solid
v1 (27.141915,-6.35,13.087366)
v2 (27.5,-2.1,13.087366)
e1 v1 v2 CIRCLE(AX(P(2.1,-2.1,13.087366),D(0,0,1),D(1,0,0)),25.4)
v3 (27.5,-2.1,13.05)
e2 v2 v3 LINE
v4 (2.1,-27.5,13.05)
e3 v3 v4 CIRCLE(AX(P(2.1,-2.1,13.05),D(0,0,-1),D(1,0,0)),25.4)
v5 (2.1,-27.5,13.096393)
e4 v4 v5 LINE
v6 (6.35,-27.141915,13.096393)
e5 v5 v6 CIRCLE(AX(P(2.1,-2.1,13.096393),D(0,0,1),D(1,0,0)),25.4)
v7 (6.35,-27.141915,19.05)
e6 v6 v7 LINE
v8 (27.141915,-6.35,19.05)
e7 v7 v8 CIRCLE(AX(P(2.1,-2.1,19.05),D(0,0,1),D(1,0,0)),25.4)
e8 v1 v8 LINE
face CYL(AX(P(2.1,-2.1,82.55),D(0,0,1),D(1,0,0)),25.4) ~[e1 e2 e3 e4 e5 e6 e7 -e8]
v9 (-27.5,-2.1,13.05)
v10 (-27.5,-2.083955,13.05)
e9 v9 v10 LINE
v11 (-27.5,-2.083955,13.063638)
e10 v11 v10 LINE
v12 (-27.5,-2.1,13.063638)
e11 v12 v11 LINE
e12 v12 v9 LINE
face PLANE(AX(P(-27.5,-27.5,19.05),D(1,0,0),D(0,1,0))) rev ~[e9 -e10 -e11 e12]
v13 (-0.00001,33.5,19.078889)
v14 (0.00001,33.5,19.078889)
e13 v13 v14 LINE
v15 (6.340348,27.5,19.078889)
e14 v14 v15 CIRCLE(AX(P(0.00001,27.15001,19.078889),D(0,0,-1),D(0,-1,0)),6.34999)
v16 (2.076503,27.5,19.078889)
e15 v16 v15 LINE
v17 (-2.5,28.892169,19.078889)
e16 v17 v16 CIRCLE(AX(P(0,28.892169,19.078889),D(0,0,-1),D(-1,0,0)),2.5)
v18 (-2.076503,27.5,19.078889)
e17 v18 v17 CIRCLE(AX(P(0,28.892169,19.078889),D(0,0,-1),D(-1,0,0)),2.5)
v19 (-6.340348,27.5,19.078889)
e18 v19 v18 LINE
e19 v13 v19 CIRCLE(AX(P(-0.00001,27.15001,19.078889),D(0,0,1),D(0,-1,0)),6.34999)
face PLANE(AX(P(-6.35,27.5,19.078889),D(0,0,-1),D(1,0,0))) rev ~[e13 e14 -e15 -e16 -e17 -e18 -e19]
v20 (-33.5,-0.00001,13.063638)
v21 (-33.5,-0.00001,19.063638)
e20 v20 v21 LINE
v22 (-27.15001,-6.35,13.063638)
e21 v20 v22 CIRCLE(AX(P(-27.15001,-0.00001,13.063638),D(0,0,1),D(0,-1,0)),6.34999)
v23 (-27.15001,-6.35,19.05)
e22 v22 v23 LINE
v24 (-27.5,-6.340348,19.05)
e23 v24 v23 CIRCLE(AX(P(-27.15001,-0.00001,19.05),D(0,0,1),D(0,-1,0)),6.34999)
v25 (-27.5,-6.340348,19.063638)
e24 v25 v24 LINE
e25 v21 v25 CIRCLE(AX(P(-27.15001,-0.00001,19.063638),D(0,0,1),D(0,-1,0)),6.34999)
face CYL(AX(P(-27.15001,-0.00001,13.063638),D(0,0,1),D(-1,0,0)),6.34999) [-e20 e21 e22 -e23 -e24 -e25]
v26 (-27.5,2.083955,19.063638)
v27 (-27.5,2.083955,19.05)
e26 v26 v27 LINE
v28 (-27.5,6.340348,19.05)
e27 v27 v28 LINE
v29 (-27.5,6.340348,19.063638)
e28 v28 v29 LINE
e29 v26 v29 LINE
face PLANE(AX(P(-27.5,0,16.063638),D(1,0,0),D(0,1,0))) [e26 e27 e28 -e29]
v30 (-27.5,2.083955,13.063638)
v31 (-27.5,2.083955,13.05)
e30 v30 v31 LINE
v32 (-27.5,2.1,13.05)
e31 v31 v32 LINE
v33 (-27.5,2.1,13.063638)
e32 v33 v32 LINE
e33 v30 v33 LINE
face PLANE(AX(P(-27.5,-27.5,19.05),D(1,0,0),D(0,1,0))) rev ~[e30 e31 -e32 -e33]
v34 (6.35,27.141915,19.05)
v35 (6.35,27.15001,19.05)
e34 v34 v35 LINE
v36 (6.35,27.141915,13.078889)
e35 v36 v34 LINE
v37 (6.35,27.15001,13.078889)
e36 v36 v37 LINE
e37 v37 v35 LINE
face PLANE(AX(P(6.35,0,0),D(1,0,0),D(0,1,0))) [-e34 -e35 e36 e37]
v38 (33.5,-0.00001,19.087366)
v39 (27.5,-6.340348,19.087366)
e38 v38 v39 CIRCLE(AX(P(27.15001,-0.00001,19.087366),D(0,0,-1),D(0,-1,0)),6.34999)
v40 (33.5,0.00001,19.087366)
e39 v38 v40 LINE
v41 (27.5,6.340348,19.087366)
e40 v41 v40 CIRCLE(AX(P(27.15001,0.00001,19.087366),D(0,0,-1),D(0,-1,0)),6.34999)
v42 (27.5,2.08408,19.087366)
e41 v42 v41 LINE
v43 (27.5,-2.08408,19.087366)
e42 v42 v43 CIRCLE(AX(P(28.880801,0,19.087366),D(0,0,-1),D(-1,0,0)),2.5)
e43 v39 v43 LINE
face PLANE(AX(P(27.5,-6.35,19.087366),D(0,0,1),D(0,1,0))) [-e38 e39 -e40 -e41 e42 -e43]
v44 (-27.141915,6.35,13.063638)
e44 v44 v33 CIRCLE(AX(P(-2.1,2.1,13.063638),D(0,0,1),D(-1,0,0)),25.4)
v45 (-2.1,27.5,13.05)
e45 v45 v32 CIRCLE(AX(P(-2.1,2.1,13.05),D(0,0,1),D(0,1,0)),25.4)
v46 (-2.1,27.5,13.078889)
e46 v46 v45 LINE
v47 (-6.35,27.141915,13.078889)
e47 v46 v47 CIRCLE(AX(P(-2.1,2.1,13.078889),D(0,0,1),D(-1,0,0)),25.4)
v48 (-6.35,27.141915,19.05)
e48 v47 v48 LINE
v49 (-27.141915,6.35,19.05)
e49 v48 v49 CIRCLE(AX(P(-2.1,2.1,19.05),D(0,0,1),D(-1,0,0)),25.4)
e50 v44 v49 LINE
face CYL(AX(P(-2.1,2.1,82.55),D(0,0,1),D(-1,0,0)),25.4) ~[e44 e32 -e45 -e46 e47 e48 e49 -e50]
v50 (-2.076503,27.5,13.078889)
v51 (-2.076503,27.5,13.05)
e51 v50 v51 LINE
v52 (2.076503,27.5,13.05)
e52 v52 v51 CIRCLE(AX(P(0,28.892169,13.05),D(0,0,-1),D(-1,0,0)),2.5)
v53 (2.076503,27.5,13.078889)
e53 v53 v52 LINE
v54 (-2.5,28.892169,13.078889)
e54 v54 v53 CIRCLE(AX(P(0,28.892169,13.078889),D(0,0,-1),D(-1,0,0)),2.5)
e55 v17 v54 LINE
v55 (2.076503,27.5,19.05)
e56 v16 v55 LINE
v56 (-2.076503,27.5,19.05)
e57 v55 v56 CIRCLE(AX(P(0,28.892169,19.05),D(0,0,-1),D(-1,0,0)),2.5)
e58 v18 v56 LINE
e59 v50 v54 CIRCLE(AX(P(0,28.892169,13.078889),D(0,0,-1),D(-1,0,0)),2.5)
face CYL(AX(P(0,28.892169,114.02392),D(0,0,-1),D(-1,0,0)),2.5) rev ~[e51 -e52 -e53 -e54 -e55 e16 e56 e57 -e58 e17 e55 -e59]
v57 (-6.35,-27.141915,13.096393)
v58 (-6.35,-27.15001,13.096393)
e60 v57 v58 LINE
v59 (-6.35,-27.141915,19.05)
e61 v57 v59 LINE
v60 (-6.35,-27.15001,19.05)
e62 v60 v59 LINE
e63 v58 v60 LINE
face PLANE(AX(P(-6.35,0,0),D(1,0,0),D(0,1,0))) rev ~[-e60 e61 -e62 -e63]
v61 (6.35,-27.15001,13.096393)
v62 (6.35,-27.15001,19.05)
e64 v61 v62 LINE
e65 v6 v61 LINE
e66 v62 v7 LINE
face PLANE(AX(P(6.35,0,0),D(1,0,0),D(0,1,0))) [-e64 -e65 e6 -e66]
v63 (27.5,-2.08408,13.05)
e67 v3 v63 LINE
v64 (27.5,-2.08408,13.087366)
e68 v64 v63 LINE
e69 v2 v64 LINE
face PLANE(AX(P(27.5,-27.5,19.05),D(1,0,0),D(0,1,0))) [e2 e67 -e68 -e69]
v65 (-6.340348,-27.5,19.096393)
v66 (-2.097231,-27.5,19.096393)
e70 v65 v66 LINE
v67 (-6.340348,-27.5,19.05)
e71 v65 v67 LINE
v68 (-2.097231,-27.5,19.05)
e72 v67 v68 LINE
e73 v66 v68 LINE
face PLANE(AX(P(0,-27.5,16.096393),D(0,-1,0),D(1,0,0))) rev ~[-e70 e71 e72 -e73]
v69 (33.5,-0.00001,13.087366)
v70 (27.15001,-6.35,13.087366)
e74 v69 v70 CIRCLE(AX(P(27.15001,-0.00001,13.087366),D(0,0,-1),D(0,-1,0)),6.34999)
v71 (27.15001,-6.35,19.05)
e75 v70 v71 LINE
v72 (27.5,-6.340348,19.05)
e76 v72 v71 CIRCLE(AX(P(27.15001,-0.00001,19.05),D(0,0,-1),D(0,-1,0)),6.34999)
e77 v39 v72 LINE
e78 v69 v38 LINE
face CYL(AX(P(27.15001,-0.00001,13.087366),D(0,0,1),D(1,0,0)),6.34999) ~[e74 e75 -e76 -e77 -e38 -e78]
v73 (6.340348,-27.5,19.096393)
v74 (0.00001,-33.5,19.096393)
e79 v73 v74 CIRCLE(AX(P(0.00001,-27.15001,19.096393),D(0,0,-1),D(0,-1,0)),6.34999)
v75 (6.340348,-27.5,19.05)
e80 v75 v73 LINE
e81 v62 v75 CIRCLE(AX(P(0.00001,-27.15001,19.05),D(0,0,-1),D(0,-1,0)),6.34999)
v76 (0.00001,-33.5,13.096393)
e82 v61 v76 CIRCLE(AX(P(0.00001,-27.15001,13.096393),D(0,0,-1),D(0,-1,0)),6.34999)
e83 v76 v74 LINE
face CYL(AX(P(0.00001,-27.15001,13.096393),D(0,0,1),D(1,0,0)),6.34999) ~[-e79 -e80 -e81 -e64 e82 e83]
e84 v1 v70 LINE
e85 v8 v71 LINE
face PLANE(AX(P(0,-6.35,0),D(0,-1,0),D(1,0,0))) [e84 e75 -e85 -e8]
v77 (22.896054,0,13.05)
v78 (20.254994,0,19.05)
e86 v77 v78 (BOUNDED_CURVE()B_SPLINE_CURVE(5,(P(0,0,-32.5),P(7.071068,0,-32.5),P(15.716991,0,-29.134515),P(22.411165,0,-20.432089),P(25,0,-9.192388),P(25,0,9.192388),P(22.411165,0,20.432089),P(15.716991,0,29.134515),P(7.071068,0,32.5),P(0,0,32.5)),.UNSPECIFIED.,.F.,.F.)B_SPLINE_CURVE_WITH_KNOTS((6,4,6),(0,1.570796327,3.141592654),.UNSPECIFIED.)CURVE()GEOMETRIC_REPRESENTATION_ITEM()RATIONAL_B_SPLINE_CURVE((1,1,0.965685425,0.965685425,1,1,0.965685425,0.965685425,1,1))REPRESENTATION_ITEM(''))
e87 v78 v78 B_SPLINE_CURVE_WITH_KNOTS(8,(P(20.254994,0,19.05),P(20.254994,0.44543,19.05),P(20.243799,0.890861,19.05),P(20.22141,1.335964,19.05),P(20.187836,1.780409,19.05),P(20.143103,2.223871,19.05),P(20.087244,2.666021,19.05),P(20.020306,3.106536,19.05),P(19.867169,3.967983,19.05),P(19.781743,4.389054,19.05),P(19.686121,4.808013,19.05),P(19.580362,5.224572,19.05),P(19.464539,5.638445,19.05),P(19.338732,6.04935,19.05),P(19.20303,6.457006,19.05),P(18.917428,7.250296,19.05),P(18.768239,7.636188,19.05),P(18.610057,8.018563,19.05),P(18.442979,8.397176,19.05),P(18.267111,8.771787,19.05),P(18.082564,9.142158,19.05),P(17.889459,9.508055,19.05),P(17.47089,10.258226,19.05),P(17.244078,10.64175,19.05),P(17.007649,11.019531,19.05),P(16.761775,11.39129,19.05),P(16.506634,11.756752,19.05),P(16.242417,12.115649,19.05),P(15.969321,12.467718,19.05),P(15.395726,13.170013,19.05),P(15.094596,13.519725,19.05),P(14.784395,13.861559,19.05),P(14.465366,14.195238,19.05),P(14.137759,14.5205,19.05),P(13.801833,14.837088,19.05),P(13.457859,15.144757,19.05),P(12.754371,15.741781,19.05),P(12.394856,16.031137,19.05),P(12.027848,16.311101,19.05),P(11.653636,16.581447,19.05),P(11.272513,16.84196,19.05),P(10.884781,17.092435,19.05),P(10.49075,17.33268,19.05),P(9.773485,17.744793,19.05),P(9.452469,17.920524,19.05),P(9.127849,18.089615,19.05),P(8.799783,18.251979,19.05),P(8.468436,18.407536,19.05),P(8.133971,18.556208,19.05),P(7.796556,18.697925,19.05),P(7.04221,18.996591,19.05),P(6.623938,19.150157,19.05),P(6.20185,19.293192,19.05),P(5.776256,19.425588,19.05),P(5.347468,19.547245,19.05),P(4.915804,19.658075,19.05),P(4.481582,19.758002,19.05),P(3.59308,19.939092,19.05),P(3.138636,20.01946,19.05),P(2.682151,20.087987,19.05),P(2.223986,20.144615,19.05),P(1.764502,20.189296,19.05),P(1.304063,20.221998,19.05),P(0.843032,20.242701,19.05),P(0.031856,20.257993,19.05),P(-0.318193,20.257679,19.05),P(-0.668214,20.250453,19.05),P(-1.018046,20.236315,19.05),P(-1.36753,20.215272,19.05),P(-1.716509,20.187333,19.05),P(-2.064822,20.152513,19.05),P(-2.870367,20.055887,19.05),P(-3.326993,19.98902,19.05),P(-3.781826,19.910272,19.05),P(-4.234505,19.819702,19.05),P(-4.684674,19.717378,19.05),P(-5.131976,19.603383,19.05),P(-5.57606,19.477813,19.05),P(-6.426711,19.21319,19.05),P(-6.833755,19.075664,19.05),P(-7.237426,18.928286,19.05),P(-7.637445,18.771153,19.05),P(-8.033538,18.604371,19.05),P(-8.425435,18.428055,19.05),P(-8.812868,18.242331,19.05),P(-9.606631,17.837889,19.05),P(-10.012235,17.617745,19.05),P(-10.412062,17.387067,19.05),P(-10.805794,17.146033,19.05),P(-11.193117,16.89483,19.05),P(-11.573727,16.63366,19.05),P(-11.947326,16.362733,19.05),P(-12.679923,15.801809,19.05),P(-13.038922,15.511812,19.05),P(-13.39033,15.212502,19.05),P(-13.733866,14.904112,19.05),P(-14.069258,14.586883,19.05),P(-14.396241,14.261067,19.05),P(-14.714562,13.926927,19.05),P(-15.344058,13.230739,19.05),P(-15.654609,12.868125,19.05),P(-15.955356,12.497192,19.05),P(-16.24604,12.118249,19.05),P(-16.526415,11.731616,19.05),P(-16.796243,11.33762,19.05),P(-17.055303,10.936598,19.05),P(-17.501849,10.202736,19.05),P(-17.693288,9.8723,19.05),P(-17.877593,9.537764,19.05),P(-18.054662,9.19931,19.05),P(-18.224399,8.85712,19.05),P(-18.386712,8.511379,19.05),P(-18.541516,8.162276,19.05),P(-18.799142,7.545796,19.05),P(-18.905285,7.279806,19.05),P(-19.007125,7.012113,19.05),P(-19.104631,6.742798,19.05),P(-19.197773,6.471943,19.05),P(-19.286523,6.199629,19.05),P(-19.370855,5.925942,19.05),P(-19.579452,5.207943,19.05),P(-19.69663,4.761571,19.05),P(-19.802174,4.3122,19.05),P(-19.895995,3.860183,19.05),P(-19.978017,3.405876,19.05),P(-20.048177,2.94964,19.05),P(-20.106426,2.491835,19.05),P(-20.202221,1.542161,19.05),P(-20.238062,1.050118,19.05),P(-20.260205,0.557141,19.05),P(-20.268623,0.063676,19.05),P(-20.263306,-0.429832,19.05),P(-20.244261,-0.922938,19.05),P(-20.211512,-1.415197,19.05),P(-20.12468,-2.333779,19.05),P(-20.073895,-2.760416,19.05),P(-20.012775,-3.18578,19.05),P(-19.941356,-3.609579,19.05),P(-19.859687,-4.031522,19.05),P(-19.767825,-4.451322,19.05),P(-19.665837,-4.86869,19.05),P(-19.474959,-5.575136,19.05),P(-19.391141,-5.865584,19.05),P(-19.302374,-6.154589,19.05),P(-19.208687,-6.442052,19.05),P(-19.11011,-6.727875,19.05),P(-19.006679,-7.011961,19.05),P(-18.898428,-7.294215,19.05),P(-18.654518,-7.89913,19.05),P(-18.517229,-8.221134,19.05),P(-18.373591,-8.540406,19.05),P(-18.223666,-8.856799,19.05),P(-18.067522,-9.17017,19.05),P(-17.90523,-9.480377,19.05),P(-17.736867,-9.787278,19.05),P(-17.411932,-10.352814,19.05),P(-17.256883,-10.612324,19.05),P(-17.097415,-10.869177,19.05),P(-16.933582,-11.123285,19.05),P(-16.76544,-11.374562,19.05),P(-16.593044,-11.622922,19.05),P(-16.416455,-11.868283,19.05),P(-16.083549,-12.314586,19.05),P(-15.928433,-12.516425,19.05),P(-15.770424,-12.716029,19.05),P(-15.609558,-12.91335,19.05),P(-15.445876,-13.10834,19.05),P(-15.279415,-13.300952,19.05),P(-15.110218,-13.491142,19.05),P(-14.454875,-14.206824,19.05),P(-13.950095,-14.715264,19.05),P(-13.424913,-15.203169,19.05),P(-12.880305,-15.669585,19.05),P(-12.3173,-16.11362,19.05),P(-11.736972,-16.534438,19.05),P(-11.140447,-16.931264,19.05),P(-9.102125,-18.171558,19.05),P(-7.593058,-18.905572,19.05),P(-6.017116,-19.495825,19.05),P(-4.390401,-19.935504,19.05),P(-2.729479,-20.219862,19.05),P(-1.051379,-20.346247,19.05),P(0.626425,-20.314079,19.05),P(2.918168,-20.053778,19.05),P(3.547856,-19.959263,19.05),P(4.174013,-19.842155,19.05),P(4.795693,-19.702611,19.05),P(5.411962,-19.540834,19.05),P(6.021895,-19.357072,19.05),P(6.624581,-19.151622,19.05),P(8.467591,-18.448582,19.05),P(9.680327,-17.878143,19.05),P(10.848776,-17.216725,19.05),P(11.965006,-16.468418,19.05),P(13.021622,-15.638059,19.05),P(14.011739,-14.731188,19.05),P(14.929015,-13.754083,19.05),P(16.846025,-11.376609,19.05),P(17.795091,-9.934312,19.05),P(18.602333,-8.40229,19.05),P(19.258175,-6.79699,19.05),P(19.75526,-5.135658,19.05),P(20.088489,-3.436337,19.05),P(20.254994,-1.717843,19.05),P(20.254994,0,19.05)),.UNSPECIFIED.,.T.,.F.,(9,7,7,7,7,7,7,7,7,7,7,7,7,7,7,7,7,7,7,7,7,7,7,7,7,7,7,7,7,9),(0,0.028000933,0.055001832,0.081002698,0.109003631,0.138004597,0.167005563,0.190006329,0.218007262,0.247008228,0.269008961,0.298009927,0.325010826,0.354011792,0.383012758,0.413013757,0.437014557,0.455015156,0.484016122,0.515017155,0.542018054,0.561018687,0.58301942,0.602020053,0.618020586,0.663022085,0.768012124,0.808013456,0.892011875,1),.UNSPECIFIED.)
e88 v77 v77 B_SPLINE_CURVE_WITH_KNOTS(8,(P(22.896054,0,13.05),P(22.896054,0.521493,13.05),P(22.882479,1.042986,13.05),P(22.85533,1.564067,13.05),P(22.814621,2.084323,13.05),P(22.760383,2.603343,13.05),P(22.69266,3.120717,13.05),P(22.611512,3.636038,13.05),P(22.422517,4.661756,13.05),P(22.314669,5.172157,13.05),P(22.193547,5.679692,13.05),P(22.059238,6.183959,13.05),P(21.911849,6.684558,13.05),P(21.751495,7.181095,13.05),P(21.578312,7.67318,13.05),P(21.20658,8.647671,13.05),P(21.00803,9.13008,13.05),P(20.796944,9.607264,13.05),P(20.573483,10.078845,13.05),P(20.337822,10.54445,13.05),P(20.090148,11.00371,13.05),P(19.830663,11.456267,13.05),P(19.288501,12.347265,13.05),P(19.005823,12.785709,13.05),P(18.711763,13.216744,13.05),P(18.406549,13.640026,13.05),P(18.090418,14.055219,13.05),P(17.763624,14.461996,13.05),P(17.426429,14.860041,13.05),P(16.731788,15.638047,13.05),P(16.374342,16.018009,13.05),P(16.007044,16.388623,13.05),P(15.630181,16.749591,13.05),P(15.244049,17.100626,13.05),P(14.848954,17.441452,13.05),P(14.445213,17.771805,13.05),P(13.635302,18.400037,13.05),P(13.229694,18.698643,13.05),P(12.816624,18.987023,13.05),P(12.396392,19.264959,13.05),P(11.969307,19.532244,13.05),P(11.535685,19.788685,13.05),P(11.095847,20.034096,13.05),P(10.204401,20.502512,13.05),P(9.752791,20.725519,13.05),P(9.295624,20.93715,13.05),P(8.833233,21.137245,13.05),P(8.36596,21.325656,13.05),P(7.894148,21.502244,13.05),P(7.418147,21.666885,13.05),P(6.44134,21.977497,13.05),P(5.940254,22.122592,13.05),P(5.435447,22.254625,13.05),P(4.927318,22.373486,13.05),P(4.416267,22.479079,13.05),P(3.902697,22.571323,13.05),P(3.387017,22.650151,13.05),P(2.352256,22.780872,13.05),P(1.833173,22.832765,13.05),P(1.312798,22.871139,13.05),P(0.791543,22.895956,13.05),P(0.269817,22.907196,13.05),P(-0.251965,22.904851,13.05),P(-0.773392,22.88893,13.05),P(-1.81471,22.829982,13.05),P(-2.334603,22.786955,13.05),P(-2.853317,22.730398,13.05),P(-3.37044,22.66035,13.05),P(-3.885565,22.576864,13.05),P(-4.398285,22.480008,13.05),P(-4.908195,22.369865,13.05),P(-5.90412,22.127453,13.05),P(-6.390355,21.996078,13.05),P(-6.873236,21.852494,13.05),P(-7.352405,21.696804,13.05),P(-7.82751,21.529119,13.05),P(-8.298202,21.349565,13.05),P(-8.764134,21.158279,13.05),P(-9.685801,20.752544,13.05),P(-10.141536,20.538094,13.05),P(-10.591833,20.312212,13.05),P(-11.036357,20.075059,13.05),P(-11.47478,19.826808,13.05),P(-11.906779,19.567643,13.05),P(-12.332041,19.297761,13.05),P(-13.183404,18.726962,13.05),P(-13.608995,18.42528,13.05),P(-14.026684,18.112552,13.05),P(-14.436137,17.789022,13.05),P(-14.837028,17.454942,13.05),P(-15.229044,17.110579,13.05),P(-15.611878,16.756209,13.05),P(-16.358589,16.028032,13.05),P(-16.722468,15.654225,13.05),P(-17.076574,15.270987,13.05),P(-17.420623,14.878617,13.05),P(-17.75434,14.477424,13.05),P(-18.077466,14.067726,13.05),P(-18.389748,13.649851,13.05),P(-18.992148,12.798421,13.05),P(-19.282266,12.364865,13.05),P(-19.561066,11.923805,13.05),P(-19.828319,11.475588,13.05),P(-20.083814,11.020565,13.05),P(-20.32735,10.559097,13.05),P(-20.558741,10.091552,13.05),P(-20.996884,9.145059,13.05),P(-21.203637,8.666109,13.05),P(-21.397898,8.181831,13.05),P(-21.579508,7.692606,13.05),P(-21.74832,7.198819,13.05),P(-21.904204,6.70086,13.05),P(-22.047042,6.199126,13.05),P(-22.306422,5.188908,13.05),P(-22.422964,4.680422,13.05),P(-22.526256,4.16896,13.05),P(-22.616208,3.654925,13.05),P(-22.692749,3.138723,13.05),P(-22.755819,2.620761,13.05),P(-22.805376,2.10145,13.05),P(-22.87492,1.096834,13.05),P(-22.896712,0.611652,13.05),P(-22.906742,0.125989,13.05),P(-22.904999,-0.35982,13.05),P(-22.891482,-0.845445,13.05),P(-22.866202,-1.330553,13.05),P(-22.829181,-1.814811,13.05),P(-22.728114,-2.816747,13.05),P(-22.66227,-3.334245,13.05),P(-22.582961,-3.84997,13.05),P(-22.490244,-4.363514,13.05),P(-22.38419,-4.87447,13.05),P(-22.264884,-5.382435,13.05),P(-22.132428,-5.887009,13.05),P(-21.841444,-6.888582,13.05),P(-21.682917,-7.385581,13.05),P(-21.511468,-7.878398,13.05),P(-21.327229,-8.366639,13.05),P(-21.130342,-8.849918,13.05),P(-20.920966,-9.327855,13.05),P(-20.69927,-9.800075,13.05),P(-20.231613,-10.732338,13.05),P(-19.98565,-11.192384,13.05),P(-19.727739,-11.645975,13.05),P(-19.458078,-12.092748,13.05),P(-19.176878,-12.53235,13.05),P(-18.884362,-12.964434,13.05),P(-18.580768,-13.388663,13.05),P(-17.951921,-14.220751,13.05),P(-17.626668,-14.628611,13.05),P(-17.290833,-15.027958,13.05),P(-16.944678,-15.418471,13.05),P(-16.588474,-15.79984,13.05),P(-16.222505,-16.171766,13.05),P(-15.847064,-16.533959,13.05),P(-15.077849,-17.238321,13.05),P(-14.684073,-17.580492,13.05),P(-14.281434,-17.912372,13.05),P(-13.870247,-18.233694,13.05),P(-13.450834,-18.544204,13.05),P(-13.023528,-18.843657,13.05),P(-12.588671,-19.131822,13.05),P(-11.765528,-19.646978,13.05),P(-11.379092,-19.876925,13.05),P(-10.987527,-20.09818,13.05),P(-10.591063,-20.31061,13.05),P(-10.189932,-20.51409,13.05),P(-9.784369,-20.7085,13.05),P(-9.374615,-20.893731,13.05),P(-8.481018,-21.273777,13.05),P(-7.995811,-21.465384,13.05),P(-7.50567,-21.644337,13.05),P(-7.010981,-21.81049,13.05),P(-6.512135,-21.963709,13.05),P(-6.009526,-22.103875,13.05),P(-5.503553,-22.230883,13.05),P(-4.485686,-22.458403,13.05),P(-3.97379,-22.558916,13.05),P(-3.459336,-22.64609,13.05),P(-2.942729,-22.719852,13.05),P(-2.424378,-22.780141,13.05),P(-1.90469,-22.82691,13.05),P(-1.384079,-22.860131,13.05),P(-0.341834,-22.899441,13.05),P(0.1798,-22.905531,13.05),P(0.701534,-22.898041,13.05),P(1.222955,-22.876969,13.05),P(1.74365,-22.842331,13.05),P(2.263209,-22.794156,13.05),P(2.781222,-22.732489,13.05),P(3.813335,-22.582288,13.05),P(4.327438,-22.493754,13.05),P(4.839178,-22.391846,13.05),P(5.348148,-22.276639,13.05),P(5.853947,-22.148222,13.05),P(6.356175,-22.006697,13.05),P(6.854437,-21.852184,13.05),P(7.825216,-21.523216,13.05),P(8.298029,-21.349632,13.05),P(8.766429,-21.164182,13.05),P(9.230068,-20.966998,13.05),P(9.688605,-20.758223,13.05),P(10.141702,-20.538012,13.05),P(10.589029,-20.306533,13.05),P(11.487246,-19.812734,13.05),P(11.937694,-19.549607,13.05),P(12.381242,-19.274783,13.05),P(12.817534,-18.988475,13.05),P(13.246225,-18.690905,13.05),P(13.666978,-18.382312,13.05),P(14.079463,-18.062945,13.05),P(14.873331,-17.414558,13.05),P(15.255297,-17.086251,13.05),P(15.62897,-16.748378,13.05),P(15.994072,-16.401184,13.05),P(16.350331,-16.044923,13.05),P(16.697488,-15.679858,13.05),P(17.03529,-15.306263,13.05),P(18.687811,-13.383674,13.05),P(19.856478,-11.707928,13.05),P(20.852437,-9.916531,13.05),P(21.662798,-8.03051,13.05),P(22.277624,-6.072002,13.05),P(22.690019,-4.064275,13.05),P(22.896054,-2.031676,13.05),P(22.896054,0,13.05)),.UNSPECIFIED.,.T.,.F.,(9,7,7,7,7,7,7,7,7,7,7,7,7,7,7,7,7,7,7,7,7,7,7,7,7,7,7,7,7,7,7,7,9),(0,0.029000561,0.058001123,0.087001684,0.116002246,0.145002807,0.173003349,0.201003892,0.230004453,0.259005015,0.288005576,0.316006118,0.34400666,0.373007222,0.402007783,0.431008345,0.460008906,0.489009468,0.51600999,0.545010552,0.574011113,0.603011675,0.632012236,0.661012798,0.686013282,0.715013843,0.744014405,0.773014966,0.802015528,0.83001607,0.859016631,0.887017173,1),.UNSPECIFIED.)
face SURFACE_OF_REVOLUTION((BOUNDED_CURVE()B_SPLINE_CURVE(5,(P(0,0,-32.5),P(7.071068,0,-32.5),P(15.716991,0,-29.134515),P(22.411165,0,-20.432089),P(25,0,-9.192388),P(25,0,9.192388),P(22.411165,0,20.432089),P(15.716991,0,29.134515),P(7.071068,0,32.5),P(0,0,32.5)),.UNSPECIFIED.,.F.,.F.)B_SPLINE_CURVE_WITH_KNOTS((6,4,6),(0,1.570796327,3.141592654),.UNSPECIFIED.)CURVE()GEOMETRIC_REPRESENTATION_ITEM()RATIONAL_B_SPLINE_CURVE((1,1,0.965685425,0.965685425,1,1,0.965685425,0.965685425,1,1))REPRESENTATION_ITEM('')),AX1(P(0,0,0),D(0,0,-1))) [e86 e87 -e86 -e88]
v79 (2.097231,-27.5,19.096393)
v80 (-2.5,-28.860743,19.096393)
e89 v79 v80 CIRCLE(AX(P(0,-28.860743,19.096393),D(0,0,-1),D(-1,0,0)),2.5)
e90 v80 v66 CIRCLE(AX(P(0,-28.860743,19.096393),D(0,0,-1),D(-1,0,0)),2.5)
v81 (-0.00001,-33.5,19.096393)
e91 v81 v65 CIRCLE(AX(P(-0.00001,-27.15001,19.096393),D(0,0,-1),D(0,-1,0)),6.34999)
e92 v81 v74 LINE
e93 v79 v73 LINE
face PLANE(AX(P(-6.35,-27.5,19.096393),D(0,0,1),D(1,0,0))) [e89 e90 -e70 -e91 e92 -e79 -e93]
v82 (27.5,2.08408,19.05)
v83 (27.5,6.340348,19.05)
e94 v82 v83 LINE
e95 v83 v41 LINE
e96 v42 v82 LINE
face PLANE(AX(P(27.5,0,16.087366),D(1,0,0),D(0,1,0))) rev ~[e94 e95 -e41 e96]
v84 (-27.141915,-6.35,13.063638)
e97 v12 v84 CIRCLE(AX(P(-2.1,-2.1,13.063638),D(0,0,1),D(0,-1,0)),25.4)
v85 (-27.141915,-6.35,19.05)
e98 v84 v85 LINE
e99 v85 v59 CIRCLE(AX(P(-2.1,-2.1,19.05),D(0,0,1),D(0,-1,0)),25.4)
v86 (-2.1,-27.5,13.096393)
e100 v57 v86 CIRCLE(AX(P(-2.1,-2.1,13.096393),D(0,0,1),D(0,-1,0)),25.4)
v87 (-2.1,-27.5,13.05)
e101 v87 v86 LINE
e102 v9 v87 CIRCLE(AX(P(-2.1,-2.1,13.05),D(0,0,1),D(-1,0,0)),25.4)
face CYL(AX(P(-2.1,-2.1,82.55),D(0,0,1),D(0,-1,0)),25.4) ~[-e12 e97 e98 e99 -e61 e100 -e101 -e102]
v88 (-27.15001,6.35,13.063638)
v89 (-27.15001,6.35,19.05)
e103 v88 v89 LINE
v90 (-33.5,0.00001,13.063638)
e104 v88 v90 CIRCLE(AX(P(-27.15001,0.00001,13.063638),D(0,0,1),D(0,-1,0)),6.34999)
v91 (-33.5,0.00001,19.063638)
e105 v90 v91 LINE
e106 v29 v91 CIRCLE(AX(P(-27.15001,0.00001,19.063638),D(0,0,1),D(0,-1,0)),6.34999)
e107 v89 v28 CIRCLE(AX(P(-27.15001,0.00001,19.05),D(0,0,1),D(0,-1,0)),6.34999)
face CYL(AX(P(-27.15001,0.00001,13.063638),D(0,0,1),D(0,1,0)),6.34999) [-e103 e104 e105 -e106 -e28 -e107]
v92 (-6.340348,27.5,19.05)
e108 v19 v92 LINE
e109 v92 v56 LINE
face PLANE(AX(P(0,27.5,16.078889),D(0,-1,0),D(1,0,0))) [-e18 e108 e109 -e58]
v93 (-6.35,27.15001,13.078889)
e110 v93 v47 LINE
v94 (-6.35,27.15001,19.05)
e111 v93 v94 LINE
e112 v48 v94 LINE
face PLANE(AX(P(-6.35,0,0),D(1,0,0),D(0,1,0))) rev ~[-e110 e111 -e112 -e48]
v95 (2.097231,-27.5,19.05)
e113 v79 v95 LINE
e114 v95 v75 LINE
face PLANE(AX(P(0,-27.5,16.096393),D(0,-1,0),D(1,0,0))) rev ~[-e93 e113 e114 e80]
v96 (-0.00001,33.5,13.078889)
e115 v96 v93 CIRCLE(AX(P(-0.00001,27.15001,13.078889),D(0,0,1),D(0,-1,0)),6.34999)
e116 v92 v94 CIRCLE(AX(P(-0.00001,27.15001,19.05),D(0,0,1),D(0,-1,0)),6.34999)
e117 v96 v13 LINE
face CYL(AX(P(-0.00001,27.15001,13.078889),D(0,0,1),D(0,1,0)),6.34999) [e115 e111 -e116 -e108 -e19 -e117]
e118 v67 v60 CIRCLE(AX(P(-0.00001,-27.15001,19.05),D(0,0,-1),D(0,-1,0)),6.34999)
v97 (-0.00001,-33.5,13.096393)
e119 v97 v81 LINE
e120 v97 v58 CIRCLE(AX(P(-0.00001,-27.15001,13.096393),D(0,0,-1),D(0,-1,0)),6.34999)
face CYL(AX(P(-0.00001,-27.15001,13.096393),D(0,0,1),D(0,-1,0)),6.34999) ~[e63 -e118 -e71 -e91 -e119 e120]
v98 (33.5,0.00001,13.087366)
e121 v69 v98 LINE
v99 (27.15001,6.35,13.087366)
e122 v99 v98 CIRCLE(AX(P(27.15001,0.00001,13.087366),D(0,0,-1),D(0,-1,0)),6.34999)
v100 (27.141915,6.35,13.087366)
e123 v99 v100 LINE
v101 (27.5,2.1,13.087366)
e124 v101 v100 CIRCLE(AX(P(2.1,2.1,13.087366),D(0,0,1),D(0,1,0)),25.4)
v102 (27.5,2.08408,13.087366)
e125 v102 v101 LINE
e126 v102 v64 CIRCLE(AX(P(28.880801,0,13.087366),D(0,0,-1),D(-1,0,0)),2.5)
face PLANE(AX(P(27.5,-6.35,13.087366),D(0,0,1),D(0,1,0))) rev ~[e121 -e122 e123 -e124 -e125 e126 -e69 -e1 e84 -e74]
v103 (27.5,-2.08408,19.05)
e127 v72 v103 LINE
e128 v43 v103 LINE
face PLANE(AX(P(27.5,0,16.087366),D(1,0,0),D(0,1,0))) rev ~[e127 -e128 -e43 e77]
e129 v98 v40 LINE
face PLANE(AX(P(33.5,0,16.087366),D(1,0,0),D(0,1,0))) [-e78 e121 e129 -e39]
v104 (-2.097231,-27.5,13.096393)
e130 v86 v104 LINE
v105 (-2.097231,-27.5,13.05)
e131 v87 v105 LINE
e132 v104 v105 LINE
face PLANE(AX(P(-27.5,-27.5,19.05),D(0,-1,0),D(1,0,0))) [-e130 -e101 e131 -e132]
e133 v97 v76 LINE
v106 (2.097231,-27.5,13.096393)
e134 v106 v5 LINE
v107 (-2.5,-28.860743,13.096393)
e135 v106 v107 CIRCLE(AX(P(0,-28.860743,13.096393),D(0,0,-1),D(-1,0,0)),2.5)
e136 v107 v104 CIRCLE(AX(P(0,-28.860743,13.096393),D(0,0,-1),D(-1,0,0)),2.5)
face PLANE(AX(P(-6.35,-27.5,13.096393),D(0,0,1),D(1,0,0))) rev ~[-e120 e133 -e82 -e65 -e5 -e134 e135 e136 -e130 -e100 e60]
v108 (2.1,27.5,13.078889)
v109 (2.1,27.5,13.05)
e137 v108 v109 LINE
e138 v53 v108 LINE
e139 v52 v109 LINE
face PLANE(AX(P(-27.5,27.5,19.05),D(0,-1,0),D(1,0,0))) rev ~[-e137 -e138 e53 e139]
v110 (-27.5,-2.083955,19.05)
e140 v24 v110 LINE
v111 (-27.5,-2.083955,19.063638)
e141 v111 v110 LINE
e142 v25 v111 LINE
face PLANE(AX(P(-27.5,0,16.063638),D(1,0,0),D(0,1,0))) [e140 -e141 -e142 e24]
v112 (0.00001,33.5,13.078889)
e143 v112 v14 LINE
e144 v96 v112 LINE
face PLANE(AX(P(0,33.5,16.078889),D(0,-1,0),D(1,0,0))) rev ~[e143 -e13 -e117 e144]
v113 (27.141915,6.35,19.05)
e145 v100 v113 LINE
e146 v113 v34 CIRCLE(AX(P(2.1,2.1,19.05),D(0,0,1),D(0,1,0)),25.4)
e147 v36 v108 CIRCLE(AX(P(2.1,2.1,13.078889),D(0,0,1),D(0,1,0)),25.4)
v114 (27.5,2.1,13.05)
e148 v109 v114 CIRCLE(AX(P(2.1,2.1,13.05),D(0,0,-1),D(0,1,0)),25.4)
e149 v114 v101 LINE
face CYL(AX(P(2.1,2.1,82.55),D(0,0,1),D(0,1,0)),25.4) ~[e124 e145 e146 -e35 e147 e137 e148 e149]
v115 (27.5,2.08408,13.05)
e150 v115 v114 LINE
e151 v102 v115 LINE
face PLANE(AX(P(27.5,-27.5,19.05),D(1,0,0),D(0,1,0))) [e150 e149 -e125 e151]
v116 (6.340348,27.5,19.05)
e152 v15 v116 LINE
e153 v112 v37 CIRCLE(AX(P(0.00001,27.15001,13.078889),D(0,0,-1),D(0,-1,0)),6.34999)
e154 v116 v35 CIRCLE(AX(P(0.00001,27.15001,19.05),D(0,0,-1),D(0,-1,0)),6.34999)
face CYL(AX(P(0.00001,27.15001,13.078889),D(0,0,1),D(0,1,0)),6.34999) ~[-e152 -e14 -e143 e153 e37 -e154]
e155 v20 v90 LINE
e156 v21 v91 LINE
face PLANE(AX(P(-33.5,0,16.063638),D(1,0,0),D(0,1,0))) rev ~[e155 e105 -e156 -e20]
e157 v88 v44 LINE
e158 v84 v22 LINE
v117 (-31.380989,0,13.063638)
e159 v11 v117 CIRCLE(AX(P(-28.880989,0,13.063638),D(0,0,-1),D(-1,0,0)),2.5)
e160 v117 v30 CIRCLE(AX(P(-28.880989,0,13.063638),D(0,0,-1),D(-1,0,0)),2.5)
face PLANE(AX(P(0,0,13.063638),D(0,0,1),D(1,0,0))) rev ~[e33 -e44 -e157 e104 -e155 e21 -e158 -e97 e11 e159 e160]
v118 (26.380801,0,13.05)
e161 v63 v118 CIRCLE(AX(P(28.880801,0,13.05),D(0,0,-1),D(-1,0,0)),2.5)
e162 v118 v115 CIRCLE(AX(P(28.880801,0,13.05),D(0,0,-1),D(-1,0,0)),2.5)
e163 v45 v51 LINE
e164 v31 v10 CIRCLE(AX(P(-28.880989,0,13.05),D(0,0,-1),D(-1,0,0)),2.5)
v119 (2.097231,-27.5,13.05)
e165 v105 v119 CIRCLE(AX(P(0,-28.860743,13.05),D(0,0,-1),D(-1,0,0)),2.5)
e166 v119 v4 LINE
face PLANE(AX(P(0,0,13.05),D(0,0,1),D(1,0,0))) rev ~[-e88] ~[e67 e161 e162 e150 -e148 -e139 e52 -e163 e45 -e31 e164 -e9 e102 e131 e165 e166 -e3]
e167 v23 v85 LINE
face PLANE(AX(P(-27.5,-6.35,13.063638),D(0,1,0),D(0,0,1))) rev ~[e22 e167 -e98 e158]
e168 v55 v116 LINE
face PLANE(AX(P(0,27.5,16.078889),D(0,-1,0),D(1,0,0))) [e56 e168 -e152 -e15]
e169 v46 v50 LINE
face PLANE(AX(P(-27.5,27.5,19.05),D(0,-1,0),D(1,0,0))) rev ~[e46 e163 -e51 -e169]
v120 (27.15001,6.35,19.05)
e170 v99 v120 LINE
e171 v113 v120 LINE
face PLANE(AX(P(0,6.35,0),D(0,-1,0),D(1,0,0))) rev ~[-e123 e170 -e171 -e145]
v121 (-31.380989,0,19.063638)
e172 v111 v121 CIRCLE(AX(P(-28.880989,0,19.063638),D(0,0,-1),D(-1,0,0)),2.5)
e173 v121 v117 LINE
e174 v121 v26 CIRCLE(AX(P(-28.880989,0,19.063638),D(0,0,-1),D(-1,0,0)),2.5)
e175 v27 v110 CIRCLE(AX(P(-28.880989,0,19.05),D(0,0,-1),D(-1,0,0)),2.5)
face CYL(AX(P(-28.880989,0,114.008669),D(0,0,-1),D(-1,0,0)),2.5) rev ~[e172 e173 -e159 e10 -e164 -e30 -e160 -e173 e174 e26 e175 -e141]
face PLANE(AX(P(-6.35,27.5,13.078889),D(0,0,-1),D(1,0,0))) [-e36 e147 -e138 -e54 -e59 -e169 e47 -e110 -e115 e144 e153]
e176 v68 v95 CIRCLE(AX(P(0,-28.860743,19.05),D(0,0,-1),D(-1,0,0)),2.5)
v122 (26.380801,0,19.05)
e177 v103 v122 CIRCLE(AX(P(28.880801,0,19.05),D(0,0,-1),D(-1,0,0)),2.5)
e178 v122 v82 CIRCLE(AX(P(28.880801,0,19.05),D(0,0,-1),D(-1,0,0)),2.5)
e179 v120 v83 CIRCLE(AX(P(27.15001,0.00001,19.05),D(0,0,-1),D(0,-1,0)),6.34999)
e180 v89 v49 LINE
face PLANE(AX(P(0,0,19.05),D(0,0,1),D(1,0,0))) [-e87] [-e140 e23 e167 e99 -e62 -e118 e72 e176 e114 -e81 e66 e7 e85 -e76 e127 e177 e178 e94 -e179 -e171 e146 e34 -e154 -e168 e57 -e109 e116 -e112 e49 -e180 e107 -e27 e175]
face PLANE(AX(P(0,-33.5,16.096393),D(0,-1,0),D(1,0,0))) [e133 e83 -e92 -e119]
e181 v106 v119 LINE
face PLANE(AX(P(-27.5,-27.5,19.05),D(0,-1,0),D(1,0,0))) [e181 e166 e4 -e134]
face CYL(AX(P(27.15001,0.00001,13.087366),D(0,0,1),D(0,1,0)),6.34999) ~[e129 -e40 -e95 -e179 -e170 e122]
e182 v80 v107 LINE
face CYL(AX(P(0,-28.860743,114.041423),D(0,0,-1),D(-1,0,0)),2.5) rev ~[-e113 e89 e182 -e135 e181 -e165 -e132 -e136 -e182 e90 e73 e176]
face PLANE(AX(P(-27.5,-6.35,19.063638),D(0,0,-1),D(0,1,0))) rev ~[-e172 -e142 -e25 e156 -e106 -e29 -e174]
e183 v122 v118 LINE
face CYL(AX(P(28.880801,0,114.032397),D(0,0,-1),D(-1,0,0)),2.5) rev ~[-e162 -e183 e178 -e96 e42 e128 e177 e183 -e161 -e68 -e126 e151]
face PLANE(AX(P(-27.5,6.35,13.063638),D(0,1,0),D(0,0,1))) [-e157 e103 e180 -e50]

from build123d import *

# Parameters (mm, degrees)
F3_W          = 55
F3_H          = 55
F4_DEPTH      = 6
F7_W          = 12.7
F7_H          = 6
F8_DEPTH      = 6
F10_W         = 12.7
F10_H         = 6
F11_DEPTH     = 6
F13_W         = 12.7
F13_H         = 6
F14_DEPTH     = 6
F16_W         = 12.7
F16_H         = 6
F17_DEPTH     = 6
F19_D         = 5
F21_D         = 5
F23_D         = 5
F25_D         = 5
F26_T4_DEPTH  = 133
F26_T10_DEPTH = 133
F26_T15_DEPTH = 133
F26_T21_DEPTH = 133
F26_T27_DEPTH = 133
F26_T33_DEPTH = 133
F26_T38_DEPTH = 133
F26_T44_DEPTH = 133
F26_T49_DEPTH = 133
F26_T55_DEPTH = 133
F26_T61_DEPTH = 133
F26_T66_DEPTH = 133
F27_R         = 6.34999


# Not quite as in the source:
# - a fillet or chamfer that OpenCascade refuses, or shapes differently, is made with other operations: its cross-section is extruded or revolved along the edge and cut away or added
# - a fillet or chamfer is up to 0.001 mm smaller than in the source, because OpenCascade refuses the exact size


with BuildPart() as f1:
    # F0 (on Front) → F1 (revolve)
    with BuildSketch(Plane.XZ):
        with BuildLine():
            Line((0, 0), (0, -32.5))
            add(Edge.make_bspline(
                [(0, -32.5), (25, -32.5), (25, 0)],
                knots=[0, 0, 0, 1.5707963268, 1.5707963268, 1.5707963268], degree=2, weights=[1, 0.7071067812, 1]))
            Line((25, 0), (0, 0))
        make_face()
        with BuildLine():
            Line((0, 0), (25, 0))
            add(Edge.make_bspline(
                [(25, 0), (25, 32.5), (0, 32.5)],
                knots=[1.5707963268, 1.5707963268, 1.5707963268, 3.1415926536, 3.1415926536, 3.1415926536], degree=2, weights=[1, 0.7071067812, 1]))
            Line((0, 32.5), (0, 0))
        make_face()
    revolve(axis=Axis((0, 0, 0), (0, 0, -1)))


with BuildPart() as f4:
    # F3 (on offset) → F4 (new body)
    with BuildSketch(Plane.XY.offset(19.05)):
        Rectangle(F3_W, F3_H)
    extrude(amount=-F4_DEPTH)

    # F5: cut F1
    add(f1.part, mode=Mode.SUBTRACT)

    # F7 (on offset) → F8 (join)
    with BuildSketch(Plane.XZ.offset(27.5)):
        with Locations((0, 16.0963926464)):
            Rectangle(F7_W, F7_H)
    extrude(amount=F8_DEPTH)

    # F10 (on offset) → F11 (join)
    with BuildSketch(Plane.YZ.offset(27.5)):
        with Locations((0, 16.087366268)):
            Rectangle(F10_W, F10_H)
    extrude(amount=F11_DEPTH)

    # F13 (on offset) → F14 (join)
    with BuildSketch(Plane.XZ.offset(-27.5)):
        with Locations((0, 16.07888937)):
            Rectangle(F13_W, F13_H)
    extrude(amount=-F14_DEPTH)

    # F16 (on offset) → F17 (join)
    with BuildSketch(Plane.YZ.offset(-27.5)):
        with Locations((0, 16.0636380315)):
            Rectangle(F16_W, F16_H)
    extrude(amount=-F17_DEPTH)

    # F19 (through all)
    with Locations(Plane.XY.offset(19.07888937)):
        with Locations((0, 28.8921689615)):
            Hole(F19_D / 2)

    # F21 (through all)
    with Locations(Plane.XY.offset(19.0636380315)):
        with Locations((-28.8809893653, 0)):
            Hole(F21_D / 2)

    # F23 (through all)
    with Locations(Plane.XY.offset(19.087366268)):
        with Locations((28.8808012381, 0)):
            Hole(F23_D / 2)

    # F25 (through all)
    with Locations(Plane.XY.offset(19.0963926464)):
        with Locations((0, -28.8607433438)):
            Hole(F25_D / 2)

    # F26: fillet of radius 25.4 on 4 edges, made by hand


with BuildPart() as f26_tool2:
    # F26_s3 → F26_t4 (new body)
    with BuildSketch(Plane.XY.offset(82.55)):
        with BuildLine():
            ThreePointArc((-27.5, 2.1), (-20.0605122421, 20.0605122421), (-2.1, 27.5))
            Line((-2.1, 27.5), (-27.5, 27.5))
            Line((-27.5, 27.5), (-27.5, 2.1))
        make_face()
    extrude(amount=-F26_T4_DEPTH)

    split(bisect_by=Plane.XZ.offset(-6.35), keep=Keep.BOTTOM)

    split(bisect_by=Plane.YZ.offset(-6.35), keep=Keep.BOTTOM)


with BuildPart() as f4_1:
    add(f4.part)

    # F26_t1: cut F26_tool2
    add(f26_tool2.part, mode=Mode.SUBTRACT)


with BuildPart() as f26_tool8:
    # F26_s9 → F26_t10 (new body)
    with BuildSketch(Plane.XY.offset(82.55)):
        with BuildLine():
            ThreePointArc((-27.5, 2.1), (-20.0605122421, 20.0605122421), (-2.1, 27.5))
            Line((-2.1, 27.5), (-27.5, 27.5))
            Line((-27.5, 27.5), (-27.5, 2.1))
        make_face()
    extrude(amount=-F26_T10_DEPTH)

    split(bisect_by=Plane.XY.offset(13.0636380315), keep=Keep.BOTTOM)


with BuildPart() as f4_2:
    add(f4_1.part)

    # F26_t7: cut F26_tool8
    add(f26_tool8.part, mode=Mode.SUBTRACT)


with BuildPart() as f26_tool13:
    # F26_s14 → F26_t15 (new body)
    with BuildSketch(Plane.XY.offset(82.55)):
        with BuildLine():
            ThreePointArc((-27.5, 2.1), (-20.0605122421, 20.0605122421), (-2.1, 27.5))
            Line((-2.1, 27.5), (-27.5, 27.5))
            Line((-27.5, 27.5), (-27.5, 2.1))
        make_face()
    extrude(amount=-F26_T15_DEPTH)

    split(bisect_by=Plane.XY.offset(13.07888937), keep=Keep.BOTTOM)

    split(bisect_by=Plane.YZ.offset(-6.35), keep=Keep.TOP)


with BuildPart() as f4_3:
    add(f4_2.part)

    # F26_t12: cut F26_tool13
    add(f26_tool13.part, mode=Mode.SUBTRACT)


with BuildPart() as f26_tool19:
    # F26_s20 → F26_t21 (new body)
    with BuildSketch(Plane.XY.offset(82.55)):
        with BuildLine():
            ThreePointArc((-2.1, -27.5), (-20.0605122421, -20.0605122421), (-27.5, -2.1))
            Line((-27.5, -2.1), (-27.5, -27.5))
            Line((-27.5, -27.5), (-2.1, -27.5))
        make_face()
    extrude(amount=-F26_T21_DEPTH)

    split(bisect_by=Plane.YZ.offset(-6.35), keep=Keep.BOTTOM)

    split(bisect_by=Plane.XZ.offset(6.35), keep=Keep.TOP)


with BuildPart() as f4_4:
    add(f4_3.part)

    # F26_t18: cut F26_tool19
    add(f26_tool19.part, mode=Mode.SUBTRACT)


with BuildPart() as f26_tool25:
    # F26_s26 → F26_t27 (new body)
    with BuildSketch(Plane.XY.offset(82.55)):
        with BuildLine():
            ThreePointArc((-2.1, -27.5), (-20.0605122421, -20.0605122421), (-27.5, -2.1))
            Line((-27.5, -2.1), (-27.5, -27.5))
            Line((-27.5, -27.5), (-2.1, -27.5))
        make_face()
    extrude(amount=-F26_T27_DEPTH)

    split(bisect_by=Plane.XY.offset(13.0963926464), keep=Keep.BOTTOM)

    split(bisect_by=Plane.XZ.offset(6.35), keep=Keep.TOP)


with BuildPart() as f4_5:
    add(f4_4.part)

    # F26_t24: cut F26_tool25
    add(f26_tool25.part, mode=Mode.SUBTRACT)


with BuildPart() as f26_tool31:
    # F26_s32 → F26_t33 (new body)
    with BuildSketch(Plane.XY.offset(82.55)):
        with BuildLine():
            ThreePointArc((-2.1, -27.5), (-20.0605122421, -20.0605122421), (-27.5, -2.1))
            Line((-27.5, -2.1), (-27.5, -27.5))
            Line((-27.5, -27.5), (-2.1, -27.5))
        make_face()
    extrude(amount=-F26_T33_DEPTH)

    split(bisect_by=Plane.XY.offset(13.0636380315), keep=Keep.BOTTOM)


with BuildPart() as f4_6:
    add(f4_5.part)

    # F26_t30: cut F26_tool31
    add(f26_tool31.part, mode=Mode.SUBTRACT)


with BuildPart() as f26_tool36:
    # F26_s37 → F26_t38 (new body)
    with BuildSketch(Plane.XY.offset(82.55)):
        with BuildLine():
            ThreePointArc((27.5, -2.1), (20.0605122421, -20.0605122421), (2.1, -27.5))
            Line((2.1, -27.5), (27.5, -27.5))
            Line((27.5, -27.5), (27.5, -2.1))
        make_face()
    extrude(amount=-F26_T38_DEPTH)

    split(bisect_by=Plane.YZ.offset(6.35), keep=Keep.TOP)

    split(bisect_by=Plane.XZ.offset(6.35), keep=Keep.TOP)


with BuildPart() as f4_7:
    add(f4_6.part)

    # F26_t35: cut F26_tool36
    add(f26_tool36.part, mode=Mode.SUBTRACT)


with BuildPart() as f26_tool42:
    # F26_s43 → F26_t44 (new body)
    with BuildSketch(Plane.XY.offset(82.55)):
        with BuildLine():
            ThreePointArc((27.5, -2.1), (20.0605122421, -20.0605122421), (2.1, -27.5))
            Line((2.1, -27.5), (27.5, -27.5))
            Line((27.5, -27.5), (27.5, -2.1))
        make_face()
    extrude(amount=-F26_T44_DEPTH)

    split(bisect_by=Plane.XY.offset(13.087366268), keep=Keep.BOTTOM)


with BuildPart() as f4_8:
    add(f4_7.part)

    # F26_t41: cut F26_tool42
    add(f26_tool42.part, mode=Mode.SUBTRACT)


with BuildPart() as f26_tool47:
    # F26_s48 → F26_t49 (new body)
    with BuildSketch(Plane.XY.offset(82.55)):
        with BuildLine():
            ThreePointArc((27.5, -2.1), (20.0605122421, -20.0605122421), (2.1, -27.5))
            Line((2.1, -27.5), (27.5, -27.5))
            Line((27.5, -27.5), (27.5, -2.1))
        make_face()
    extrude(amount=-F26_T49_DEPTH)

    split(bisect_by=Plane.XY.offset(13.0963926464), keep=Keep.BOTTOM)

    split(bisect_by=Plane.XZ.offset(6.35), keep=Keep.TOP)


with BuildPart() as f4_9:
    add(f4_8.part)

    # F26_t46: cut F26_tool47
    add(f26_tool47.part, mode=Mode.SUBTRACT)


with BuildPart() as f26_tool53:
    # F26_s54 → F26_t55 (new body)
    with BuildSketch(Plane.XY.offset(82.55)):
        with BuildLine():
            ThreePointArc((2.1, 27.5), (20.0605122421, 20.0605122421), (27.5, 2.1))
            Line((27.5, 2.1), (27.5, 27.5))
            Line((27.5, 27.5), (2.1, 27.5))
        make_face()
    extrude(amount=-F26_T55_DEPTH)

    split(bisect_by=Plane.YZ.offset(6.35), keep=Keep.TOP)

    split(bisect_by=Plane.XZ.offset(-6.35), keep=Keep.BOTTOM)


with BuildPart() as f4_10:
    add(f4_9.part)

    # F26_t52: cut F26_tool53
    add(f26_tool53.part, mode=Mode.SUBTRACT)


with BuildPart() as f26_tool59:
    # F26_s60 → F26_t61 (new body)
    with BuildSketch(Plane.XY.offset(82.55)):
        with BuildLine():
            ThreePointArc((2.1, 27.5), (20.0605122421, 20.0605122421), (27.5, 2.1))
            Line((27.5, 2.1), (27.5, 27.5))
            Line((27.5, 27.5), (2.1, 27.5))
        make_face()
    extrude(amount=-F26_T61_DEPTH)

    split(bisect_by=Plane.XY.offset(13.07888937), keep=Keep.BOTTOM)


with BuildPart() as f4_11:
    add(f4_10.part)

    # F26_t58: cut F26_tool59
    add(f26_tool59.part, mode=Mode.SUBTRACT)


with BuildPart() as f26_tool64:
    # F26_s65 → F26_t66 (new body)
    with BuildSketch(Plane.XY.offset(82.55)):
        with BuildLine():
            ThreePointArc((2.1, 27.5), (20.0605122421, 20.0605122421), (27.5, 2.1))
            Line((27.5, 2.1), (27.5, 27.5))
            Line((27.5, 27.5), (2.1, 27.5))
        make_face()
    extrude(amount=-F26_T66_DEPTH)

    split(bisect_by=Plane.XY.offset(13.087366268), keep=Keep.BOTTOM)

    split(bisect_by=Plane.XZ.offset(-6.35), keep=Keep.TOP)


with BuildPart() as f4_12:
    add(f4_11.part)

    # F26_t63: cut F26_tool64
    add(f26_tool64.part, mode=Mode.SUBTRACT)

    # F27 (radius 6.35 in the source; OpenCascade refuses exactly that, so slightly less here)
    f27_edges = [f4_12.edges().sort_by_distance(p)[0] for p in [
        (6.35, 33.5, 16.078889),
        (-6.35, 33.5, 16.078889),
        (-33.5, 6.35, 16.063638),
        (-33.5, -6.35, 16.063638),
        (-6.35, -33.5, 16.096393),
        (6.35, -33.5, 16.096393),
        (33.5, -6.35, 16.087366),
        (33.5, 6.35, 16.087366),
    ]]
    fillet(f27_edges, radius=F27_R)


solid = f4_12.part
